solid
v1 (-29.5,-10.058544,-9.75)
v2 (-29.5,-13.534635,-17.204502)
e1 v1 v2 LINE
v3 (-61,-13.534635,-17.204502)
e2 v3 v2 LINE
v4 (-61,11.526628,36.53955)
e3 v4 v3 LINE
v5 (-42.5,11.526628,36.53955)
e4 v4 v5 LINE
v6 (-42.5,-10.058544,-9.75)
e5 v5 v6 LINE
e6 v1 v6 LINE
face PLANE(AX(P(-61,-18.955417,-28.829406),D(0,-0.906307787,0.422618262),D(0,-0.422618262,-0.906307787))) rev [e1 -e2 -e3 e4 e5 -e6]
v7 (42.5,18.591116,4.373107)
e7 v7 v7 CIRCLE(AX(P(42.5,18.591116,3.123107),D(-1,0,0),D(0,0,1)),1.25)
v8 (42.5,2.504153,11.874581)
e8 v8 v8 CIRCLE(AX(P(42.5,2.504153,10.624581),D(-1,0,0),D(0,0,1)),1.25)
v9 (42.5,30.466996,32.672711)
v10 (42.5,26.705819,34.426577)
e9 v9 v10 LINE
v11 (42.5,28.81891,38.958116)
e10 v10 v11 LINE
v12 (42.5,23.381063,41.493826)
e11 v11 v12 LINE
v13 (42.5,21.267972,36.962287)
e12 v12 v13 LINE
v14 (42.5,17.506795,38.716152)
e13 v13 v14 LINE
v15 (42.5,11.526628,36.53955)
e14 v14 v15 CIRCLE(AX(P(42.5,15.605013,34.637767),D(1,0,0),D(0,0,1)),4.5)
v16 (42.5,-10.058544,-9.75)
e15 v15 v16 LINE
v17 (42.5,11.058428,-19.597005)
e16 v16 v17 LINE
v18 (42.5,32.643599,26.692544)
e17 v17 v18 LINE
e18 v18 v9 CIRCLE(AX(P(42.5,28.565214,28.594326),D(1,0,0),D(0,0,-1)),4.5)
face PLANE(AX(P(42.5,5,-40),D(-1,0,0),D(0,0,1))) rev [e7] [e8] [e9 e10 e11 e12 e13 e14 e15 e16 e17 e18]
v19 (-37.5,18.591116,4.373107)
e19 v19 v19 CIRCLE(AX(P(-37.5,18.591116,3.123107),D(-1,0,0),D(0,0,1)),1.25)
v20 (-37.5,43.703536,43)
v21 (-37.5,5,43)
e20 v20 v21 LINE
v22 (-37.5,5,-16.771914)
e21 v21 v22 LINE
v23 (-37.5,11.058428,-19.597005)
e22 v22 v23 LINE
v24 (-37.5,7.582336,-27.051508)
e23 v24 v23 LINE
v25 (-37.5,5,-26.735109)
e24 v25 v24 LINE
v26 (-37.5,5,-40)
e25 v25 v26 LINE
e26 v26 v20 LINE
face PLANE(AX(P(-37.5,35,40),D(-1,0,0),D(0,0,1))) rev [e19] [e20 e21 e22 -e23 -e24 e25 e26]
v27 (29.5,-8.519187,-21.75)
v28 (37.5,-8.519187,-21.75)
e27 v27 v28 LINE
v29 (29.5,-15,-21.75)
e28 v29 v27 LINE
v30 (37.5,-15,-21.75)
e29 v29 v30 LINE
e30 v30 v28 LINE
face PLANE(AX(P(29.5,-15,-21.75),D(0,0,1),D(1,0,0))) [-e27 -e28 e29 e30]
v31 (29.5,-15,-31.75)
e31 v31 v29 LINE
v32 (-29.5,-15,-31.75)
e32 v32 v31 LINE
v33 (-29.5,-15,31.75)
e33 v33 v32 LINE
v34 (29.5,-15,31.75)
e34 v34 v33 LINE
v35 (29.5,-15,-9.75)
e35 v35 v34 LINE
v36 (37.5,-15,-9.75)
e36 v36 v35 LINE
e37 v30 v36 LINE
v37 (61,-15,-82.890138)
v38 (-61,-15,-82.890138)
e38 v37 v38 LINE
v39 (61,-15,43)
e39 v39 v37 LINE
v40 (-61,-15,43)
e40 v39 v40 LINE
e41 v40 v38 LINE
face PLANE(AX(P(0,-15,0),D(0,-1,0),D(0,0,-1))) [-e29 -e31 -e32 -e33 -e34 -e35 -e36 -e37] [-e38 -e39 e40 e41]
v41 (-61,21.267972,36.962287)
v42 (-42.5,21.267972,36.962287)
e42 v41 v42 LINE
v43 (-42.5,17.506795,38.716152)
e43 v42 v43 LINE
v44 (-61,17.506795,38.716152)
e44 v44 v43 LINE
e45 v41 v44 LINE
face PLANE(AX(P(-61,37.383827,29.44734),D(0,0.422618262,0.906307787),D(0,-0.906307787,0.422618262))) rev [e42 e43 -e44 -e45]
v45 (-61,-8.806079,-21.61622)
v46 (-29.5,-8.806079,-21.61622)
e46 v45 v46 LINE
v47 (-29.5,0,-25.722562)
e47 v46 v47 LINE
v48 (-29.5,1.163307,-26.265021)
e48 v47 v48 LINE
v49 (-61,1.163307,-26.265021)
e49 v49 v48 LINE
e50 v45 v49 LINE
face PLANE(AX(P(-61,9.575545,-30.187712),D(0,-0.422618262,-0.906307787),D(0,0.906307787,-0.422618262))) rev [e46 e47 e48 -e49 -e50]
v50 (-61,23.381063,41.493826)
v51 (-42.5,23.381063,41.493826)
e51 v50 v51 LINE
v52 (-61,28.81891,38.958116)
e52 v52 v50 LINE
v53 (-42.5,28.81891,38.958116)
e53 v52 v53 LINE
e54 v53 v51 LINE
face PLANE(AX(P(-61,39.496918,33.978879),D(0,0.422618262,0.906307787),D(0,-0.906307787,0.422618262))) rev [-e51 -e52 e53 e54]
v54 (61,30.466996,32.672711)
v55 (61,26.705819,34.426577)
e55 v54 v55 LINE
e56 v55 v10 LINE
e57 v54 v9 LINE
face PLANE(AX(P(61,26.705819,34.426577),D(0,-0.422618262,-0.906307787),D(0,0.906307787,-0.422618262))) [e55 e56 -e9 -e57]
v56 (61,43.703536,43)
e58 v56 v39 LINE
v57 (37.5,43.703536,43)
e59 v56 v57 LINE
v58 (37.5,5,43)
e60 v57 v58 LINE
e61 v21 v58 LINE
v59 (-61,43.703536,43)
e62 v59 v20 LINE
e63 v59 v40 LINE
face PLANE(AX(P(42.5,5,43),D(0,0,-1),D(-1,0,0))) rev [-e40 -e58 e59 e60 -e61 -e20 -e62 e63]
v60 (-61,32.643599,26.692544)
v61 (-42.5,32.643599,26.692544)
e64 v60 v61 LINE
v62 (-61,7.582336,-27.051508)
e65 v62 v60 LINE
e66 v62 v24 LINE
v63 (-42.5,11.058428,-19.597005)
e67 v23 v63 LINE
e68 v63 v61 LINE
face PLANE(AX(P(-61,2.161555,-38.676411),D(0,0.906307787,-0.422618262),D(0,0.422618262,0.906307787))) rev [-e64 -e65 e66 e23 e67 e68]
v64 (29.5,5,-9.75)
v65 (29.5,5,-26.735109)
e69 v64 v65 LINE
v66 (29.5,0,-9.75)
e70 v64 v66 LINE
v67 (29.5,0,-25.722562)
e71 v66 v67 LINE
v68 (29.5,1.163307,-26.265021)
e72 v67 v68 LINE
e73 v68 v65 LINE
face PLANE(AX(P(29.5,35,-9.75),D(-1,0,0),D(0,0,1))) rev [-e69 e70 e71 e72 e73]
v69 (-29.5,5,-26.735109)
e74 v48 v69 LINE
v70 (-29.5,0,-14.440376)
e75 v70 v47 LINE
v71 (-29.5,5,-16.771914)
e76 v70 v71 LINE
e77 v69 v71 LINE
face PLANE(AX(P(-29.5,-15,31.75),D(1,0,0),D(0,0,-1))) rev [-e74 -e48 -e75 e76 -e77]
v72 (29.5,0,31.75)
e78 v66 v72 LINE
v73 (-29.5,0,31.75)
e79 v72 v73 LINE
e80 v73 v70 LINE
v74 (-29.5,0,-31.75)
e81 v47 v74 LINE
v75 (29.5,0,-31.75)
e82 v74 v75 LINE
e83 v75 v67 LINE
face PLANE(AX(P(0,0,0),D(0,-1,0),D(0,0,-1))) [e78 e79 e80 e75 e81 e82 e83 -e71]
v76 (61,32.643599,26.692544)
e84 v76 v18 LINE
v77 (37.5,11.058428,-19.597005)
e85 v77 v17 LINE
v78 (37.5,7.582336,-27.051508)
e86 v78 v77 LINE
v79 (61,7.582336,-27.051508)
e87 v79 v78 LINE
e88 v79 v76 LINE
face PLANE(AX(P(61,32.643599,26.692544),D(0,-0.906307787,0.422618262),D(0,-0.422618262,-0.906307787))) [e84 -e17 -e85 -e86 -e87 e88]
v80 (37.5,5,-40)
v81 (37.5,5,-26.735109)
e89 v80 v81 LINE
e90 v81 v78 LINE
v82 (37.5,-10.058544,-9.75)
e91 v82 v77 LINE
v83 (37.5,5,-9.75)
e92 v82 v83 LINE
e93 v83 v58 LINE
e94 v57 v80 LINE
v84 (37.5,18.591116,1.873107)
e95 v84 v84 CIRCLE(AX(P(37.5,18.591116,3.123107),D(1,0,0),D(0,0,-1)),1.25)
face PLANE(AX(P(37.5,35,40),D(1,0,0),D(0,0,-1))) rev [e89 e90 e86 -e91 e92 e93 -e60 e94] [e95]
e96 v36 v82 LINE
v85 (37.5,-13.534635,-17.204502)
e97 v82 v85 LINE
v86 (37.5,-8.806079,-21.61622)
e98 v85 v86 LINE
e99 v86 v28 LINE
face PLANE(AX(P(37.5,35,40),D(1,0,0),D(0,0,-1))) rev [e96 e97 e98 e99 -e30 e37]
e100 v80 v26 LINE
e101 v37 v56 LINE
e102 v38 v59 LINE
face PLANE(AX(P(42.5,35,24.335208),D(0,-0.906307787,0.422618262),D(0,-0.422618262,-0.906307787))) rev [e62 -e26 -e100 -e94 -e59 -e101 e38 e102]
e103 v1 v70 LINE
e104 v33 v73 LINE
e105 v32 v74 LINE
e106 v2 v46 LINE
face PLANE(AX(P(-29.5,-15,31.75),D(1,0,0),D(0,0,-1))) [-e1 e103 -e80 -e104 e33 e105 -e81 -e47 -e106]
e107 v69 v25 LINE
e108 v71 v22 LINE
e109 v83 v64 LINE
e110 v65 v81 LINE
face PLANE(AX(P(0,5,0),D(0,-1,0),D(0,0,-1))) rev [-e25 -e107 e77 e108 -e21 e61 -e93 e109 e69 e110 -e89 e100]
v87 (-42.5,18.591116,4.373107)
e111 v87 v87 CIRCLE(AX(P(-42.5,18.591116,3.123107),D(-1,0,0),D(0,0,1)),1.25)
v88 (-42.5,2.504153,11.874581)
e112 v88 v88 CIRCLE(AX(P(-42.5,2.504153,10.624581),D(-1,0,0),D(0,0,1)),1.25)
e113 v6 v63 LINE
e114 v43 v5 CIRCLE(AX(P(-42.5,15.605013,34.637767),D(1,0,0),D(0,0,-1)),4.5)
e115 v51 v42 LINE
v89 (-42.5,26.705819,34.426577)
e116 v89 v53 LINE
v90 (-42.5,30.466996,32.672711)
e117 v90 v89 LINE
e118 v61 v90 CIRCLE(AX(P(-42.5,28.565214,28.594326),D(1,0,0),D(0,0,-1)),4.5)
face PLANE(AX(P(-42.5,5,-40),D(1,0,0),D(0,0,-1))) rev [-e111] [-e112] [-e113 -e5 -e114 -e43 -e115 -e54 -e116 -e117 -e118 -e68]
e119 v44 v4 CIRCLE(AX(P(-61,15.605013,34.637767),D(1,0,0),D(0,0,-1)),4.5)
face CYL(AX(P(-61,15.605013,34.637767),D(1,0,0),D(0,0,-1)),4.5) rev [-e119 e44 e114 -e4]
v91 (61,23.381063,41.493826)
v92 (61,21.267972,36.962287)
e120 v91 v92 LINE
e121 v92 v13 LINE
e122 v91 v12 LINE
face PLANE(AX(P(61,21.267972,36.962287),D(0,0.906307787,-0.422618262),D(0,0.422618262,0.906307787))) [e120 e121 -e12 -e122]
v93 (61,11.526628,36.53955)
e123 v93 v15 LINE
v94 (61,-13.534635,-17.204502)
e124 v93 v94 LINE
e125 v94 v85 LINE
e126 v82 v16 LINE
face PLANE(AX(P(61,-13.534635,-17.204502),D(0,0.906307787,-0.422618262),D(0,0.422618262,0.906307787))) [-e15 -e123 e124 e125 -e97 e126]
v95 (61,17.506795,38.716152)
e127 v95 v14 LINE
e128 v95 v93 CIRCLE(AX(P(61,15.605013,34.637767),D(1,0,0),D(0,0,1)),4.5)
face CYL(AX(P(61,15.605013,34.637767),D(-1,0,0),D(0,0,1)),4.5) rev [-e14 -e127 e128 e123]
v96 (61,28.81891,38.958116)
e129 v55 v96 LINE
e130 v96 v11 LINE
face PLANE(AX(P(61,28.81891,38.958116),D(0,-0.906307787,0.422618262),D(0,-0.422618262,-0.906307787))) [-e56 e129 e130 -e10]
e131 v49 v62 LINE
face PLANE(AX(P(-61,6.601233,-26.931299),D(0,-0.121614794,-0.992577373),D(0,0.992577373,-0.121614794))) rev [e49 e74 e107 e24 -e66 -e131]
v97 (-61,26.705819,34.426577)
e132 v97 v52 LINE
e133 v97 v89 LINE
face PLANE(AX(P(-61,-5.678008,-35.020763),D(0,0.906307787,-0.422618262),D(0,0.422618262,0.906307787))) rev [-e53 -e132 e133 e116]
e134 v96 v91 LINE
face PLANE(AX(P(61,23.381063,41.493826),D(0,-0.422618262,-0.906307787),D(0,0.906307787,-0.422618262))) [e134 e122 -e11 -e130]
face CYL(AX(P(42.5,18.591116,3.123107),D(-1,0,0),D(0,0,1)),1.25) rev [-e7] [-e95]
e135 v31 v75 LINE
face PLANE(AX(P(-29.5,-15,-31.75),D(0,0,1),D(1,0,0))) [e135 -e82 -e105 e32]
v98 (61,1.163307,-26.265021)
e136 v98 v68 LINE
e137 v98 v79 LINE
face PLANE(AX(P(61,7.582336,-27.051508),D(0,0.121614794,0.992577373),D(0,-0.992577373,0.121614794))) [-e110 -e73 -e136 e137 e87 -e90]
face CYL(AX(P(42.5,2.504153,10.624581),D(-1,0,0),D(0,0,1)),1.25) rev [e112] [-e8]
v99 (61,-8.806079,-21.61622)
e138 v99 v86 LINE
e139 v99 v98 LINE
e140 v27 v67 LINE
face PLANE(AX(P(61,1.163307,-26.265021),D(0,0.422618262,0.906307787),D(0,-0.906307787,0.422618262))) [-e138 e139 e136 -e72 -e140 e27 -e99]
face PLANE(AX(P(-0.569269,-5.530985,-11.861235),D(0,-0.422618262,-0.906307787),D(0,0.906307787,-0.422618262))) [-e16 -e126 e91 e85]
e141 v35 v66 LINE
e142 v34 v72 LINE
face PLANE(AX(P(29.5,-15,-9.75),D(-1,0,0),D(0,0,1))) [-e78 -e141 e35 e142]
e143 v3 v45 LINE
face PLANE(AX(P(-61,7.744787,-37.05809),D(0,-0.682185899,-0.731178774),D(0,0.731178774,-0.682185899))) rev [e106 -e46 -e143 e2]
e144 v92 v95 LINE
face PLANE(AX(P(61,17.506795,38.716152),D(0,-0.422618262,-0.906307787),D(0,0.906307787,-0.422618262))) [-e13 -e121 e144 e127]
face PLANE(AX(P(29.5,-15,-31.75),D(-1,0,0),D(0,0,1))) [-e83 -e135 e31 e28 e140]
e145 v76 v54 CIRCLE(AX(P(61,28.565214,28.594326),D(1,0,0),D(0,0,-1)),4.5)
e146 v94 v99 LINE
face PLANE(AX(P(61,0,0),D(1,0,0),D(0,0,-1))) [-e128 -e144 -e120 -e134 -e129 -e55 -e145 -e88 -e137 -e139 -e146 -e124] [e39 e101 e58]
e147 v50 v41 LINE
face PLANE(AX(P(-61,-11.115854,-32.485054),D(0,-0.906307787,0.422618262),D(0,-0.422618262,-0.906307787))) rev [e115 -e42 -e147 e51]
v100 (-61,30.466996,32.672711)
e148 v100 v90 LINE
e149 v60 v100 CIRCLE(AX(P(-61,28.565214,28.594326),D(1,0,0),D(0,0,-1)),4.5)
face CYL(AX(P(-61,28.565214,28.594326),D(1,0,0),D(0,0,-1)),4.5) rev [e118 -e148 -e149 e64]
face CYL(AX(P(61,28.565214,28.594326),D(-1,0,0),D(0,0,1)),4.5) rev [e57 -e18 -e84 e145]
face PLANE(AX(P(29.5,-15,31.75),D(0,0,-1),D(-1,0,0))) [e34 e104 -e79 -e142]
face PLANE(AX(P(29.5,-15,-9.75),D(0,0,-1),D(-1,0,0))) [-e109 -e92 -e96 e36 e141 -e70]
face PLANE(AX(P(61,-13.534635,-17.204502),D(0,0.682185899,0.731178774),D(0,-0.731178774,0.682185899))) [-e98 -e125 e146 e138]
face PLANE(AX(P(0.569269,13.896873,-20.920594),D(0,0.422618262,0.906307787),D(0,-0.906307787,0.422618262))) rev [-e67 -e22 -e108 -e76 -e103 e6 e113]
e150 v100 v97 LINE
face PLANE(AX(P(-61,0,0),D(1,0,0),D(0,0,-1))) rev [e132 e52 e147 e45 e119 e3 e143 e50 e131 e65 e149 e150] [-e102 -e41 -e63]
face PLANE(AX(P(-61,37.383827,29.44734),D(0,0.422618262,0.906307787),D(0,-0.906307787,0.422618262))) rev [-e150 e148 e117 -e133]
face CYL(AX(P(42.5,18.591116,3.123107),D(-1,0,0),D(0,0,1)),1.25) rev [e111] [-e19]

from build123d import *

# Parameters (mm, degrees)
SKETCH1_W           = 85
SKETCH1_H           = 80
BOSS_EXTRUDE1_DEPTH = 5
SKETCH4_W           = 5
SKETCH4_H           = 80
BOSS_EXTRUDE3_DEPTH = 30
SKETCH6_R           = 1.25
CUT_EXTRUDE3_DEPTH  = 101.249688279
SKETCH3_W           = 85
SKETCH3_H           = 80
BOSS_EXTRUDE4_DEPTH = 15
SKETCH8_W           = 8
SKETCH8_H           = 12
CUT_EXTRUDE4_DEPTH  = 69.053287944
MOVE_FACE1_BY       = 3
BOSS_EXTRUDE5_DEPTH = 18.5
BOSS_EXTRUDE6_START = -103.5
BOSS_EXTRUDE6_DEPTH = 18.5
CUT_EXTRUDE5_START  = -13
CUT_EXTRUDE5_DEPTH  = 13
CUT_EXTRUDE6_START  = -85
CUT_EXTRUDE6_DEPTH  = 13
DELETEFACE1_START   = 37.5
DELETEFACE1_DEPTH   = 23.5
DELETEFACE2_START   = -61
DELETEFACE2_DEPTH   = 23.5
DELETEFACE3_START   = -61
DELETEFACE3_DEPTH   = 122


# Read off the part's stored shape, not the designer's step: DeleteFace1, DeleteFace2, DeleteFace3
with BuildPart() as part:
    # Sketch1 → Boss-Extrude1 (new body)
    with BuildSketch(Plane(origin=(0, 0, 0), x_dir=(1, 0, 0), z_dir=(0, 1, 0))):
        Rectangle(SKETCH1_W, SKETCH1_H)
    extrude(amount=BOSS_EXTRUDE1_DEPTH)

    # Sketch4 → Boss-Extrude3 (add)
    with BuildSketch(Plane(origin=(0, 5, 0), x_dir=(1, 0, 0), z_dir=(0, 1, 0))):
        with Locations((-40, 0)):
            Rectangle(SKETCH4_W, SKETCH4_H)
        with Locations((40, 0)):
            Rectangle(SKETCH4_W, SKETCH4_H)
    extrude(amount=BOSS_EXTRUDE3_DEPTH)

    # Sketch6 → Cut-Extrude3 (cut, through all)
    with BuildSketch(Plane.ZY.offset(42.5)):
        with Locations((10.624581332, 2.504153155)):
            Circle(SKETCH6_R)
        with Locations((3.123107186, 18.591116375)):
            Circle(SKETCH6_R)
        Polygon((24.335207615, 35), (-40, 5), (-40, 35), align=None)
    extrude(amount=-CUT_EXTRUDE3_DEPTH, mode=Mode.SUBTRACT)

    # Sketch3 → Boss-Extrude4 (add)
    with BuildSketch(Plane.XZ):
        Rectangle(SKETCH3_W, SKETCH3_H)
        Polygon((29.5, -21.75), (37.5, -21.75), (37.5, -9.75), (29.5, -9.75), (29.5, 31.75), (-29.5, 31.75), (-29.5, -31.75), (29.5, -31.75), align=None, mode=Mode.SUBTRACT)
    extrude(amount=BOSS_EXTRUDE4_DEPTH)

    # Sketch8 → Cut-Extrude4 (cut, through all)
    with BuildSketch(Plane.XZ):
        with Locations((33.5, -15.75)):
            Rectangle(SKETCH8_W, SKETCH8_H)
    extrude(amount=-CUT_EXTRUDE4_DEPTH, mode=Mode.SUBTRACT)

    # Move Face1: a face moved outward by 3.0
    extrude(part.faces().sort_by_distance((0, -1.25, 40))[0], amount=MOVE_FACE1_BY, dir=(0, 0, 1))

    # Sketch7 → Boss-Extrude5 (add)
    with BuildSketch(Plane(origin=(42.5, 0, 0), x_dir=(0, 0, -1), z_dir=(1, 0, 0))):
        Polygon((40, -15), (40, 5), (-24.335207615, 35), (-43, 35), (-43, -15), align=None)
        with BuildLine():
            Line((-26.692544096, 32.64359903), (27.051507675, 7.582336108))
            Line((27.051507675, 7.582336108), (26.26502094, 1.163306695))
            Line((26.26502094, 1.163306695), (21.61622006, -8.806078963))
            Line((21.61622006, -8.806078963), (17.204502177, -13.534635329))
            Line((17.204502177, -13.534635329), (-36.539549595, 11.526627592))
            ThreePointArc((-36.539549595, 11.526627592), (-38.86638421, 14.065921988), (-38.716152458, 17.506794811))
            Line((-38.716152458, 17.506794811), (-36.962286672, 21.267972127))
            Line((-36.962286672, 21.267972127), (-41.493825607, 23.381063436))
            Line((-41.493825607, 23.381063436), (-38.958116037, 28.818910158))
            Line((-38.958116037, 28.818910158), (-34.426577102, 26.70581885))
            Line((-34.426577102, 26.70581885), (-32.672711316, 30.466996166))
            ThreePointArc((-32.672711316, 30.466996166), (-30.133416919, 32.793830782), (-26.692544096, 32.64359903))
        make_face(mode=Mode.SUBTRACT)
    extrude(amount=BOSS_EXTRUDE5_DEPTH)

    # Sketch7<2> → Boss-Extrude6 (add)
    with BuildSketch(Plane(origin=(42.5, 0, 0), x_dir=(0, 0, -1), z_dir=(1, 0, 0)).offset(BOSS_EXTRUDE6_START)):
        Polygon((40, -15), (40, 5), (-24.335207615, 35), (-43, 35), (-43, -15), align=None)
        with BuildLine():
            Line((-26.692544096, 32.64359903), (27.051507675, 7.582336108))
            Line((27.051507675, 7.582336108), (26.26502094, 1.163306695))
            Line((26.26502094, 1.163306695), (21.61622006, -8.806078963))
            Line((21.61622006, -8.806078963), (17.204502177, -13.534635329))
            Line((17.204502177, -13.534635329), (-36.539549595, 11.526627592))
            ThreePointArc((-36.539549595, 11.526627592), (-38.86638421, 14.065921988), (-38.716152458, 17.506794811))
            Line((-38.716152458, 17.506794811), (-36.962286672, 21.267972127))
            Line((-36.962286672, 21.267972127), (-41.493825607, 23.381063436))
            Line((-41.493825607, 23.381063436), (-38.958116037, 28.818910158))
            Line((-38.958116037, 28.818910158), (-34.426577102, 26.70581885))
            Line((-34.426577102, 26.70581885), (-32.672711316, 30.466996166))
            ThreePointArc((-32.672711316, 30.466996166), (-30.133416919, 32.793830782), (-26.692544096, 32.64359903))
        make_face(mode=Mode.SUBTRACT)
    extrude(amount=BOSS_EXTRUDE6_DEPTH)

    # Sketch9 → Cut-Extrude5 (cut)
    with BuildSketch(Plane(origin=(42.5, 0, 0), x_dir=(0, 0, -1), z_dir=(1, 0, 0)).offset(CUT_EXTRUDE5_START)):
        Polygon((21.61622006, -8.806078963), (26.26502094, 1.163306695), (27.051507675, 7.582336108), (19.597005499, 11.058427561), (9.75, -10.058543877), (17.204502177, -13.534635329), align=None)
    extrude(amount=CUT_EXTRUDE5_DEPTH, mode=Mode.SUBTRACT)

    # Sketch9<3> → Cut-Extrude6 (cut)
    with BuildSketch(Plane(origin=(42.5, 0, 0), x_dir=(0, 0, -1), z_dir=(1, 0, 0)).offset(CUT_EXTRUDE6_START)):
        Polygon((21.61622006, -8.806078963), (26.26502094, 1.163306695), (27.051507675, 7.582336108), (19.597005499, 11.058427561), (9.75, -10.058543877), (17.204502177, -13.534635329), align=None)
    extrude(amount=CUT_EXTRUDE6_DEPTH, mode=Mode.SUBTRACT)

    # DeleteFace1 outline → DeleteFace1 (add)
    with BuildSketch(Plane.YZ.offset(DELETEFACE1_START)):
        Polygon((43.703535627, 43), (35, 43), (35, 24.335207615), align=None)
    extrude(amount=DELETEFACE1_DEPTH)

    # DeleteFace2 outline → DeleteFace2 (add)
    with BuildSketch(Plane.YZ.offset(DELETEFACE2_START)):
        Polygon((43.703535627, 43), (35, 43), (35, 24.335207615), align=None)
    extrude(amount=DELETEFACE2_DEPTH)

    # DeleteFace3 outline → DeleteFace3 (add)
    with BuildSketch(Plane.YZ.offset(DELETEFACE3_START)):
        Polygon((-15, -82.89013841), (5, -40), (-15, -40), align=None)
    extrude(amount=DELETEFACE3_DEPTH)


solid = part.part
